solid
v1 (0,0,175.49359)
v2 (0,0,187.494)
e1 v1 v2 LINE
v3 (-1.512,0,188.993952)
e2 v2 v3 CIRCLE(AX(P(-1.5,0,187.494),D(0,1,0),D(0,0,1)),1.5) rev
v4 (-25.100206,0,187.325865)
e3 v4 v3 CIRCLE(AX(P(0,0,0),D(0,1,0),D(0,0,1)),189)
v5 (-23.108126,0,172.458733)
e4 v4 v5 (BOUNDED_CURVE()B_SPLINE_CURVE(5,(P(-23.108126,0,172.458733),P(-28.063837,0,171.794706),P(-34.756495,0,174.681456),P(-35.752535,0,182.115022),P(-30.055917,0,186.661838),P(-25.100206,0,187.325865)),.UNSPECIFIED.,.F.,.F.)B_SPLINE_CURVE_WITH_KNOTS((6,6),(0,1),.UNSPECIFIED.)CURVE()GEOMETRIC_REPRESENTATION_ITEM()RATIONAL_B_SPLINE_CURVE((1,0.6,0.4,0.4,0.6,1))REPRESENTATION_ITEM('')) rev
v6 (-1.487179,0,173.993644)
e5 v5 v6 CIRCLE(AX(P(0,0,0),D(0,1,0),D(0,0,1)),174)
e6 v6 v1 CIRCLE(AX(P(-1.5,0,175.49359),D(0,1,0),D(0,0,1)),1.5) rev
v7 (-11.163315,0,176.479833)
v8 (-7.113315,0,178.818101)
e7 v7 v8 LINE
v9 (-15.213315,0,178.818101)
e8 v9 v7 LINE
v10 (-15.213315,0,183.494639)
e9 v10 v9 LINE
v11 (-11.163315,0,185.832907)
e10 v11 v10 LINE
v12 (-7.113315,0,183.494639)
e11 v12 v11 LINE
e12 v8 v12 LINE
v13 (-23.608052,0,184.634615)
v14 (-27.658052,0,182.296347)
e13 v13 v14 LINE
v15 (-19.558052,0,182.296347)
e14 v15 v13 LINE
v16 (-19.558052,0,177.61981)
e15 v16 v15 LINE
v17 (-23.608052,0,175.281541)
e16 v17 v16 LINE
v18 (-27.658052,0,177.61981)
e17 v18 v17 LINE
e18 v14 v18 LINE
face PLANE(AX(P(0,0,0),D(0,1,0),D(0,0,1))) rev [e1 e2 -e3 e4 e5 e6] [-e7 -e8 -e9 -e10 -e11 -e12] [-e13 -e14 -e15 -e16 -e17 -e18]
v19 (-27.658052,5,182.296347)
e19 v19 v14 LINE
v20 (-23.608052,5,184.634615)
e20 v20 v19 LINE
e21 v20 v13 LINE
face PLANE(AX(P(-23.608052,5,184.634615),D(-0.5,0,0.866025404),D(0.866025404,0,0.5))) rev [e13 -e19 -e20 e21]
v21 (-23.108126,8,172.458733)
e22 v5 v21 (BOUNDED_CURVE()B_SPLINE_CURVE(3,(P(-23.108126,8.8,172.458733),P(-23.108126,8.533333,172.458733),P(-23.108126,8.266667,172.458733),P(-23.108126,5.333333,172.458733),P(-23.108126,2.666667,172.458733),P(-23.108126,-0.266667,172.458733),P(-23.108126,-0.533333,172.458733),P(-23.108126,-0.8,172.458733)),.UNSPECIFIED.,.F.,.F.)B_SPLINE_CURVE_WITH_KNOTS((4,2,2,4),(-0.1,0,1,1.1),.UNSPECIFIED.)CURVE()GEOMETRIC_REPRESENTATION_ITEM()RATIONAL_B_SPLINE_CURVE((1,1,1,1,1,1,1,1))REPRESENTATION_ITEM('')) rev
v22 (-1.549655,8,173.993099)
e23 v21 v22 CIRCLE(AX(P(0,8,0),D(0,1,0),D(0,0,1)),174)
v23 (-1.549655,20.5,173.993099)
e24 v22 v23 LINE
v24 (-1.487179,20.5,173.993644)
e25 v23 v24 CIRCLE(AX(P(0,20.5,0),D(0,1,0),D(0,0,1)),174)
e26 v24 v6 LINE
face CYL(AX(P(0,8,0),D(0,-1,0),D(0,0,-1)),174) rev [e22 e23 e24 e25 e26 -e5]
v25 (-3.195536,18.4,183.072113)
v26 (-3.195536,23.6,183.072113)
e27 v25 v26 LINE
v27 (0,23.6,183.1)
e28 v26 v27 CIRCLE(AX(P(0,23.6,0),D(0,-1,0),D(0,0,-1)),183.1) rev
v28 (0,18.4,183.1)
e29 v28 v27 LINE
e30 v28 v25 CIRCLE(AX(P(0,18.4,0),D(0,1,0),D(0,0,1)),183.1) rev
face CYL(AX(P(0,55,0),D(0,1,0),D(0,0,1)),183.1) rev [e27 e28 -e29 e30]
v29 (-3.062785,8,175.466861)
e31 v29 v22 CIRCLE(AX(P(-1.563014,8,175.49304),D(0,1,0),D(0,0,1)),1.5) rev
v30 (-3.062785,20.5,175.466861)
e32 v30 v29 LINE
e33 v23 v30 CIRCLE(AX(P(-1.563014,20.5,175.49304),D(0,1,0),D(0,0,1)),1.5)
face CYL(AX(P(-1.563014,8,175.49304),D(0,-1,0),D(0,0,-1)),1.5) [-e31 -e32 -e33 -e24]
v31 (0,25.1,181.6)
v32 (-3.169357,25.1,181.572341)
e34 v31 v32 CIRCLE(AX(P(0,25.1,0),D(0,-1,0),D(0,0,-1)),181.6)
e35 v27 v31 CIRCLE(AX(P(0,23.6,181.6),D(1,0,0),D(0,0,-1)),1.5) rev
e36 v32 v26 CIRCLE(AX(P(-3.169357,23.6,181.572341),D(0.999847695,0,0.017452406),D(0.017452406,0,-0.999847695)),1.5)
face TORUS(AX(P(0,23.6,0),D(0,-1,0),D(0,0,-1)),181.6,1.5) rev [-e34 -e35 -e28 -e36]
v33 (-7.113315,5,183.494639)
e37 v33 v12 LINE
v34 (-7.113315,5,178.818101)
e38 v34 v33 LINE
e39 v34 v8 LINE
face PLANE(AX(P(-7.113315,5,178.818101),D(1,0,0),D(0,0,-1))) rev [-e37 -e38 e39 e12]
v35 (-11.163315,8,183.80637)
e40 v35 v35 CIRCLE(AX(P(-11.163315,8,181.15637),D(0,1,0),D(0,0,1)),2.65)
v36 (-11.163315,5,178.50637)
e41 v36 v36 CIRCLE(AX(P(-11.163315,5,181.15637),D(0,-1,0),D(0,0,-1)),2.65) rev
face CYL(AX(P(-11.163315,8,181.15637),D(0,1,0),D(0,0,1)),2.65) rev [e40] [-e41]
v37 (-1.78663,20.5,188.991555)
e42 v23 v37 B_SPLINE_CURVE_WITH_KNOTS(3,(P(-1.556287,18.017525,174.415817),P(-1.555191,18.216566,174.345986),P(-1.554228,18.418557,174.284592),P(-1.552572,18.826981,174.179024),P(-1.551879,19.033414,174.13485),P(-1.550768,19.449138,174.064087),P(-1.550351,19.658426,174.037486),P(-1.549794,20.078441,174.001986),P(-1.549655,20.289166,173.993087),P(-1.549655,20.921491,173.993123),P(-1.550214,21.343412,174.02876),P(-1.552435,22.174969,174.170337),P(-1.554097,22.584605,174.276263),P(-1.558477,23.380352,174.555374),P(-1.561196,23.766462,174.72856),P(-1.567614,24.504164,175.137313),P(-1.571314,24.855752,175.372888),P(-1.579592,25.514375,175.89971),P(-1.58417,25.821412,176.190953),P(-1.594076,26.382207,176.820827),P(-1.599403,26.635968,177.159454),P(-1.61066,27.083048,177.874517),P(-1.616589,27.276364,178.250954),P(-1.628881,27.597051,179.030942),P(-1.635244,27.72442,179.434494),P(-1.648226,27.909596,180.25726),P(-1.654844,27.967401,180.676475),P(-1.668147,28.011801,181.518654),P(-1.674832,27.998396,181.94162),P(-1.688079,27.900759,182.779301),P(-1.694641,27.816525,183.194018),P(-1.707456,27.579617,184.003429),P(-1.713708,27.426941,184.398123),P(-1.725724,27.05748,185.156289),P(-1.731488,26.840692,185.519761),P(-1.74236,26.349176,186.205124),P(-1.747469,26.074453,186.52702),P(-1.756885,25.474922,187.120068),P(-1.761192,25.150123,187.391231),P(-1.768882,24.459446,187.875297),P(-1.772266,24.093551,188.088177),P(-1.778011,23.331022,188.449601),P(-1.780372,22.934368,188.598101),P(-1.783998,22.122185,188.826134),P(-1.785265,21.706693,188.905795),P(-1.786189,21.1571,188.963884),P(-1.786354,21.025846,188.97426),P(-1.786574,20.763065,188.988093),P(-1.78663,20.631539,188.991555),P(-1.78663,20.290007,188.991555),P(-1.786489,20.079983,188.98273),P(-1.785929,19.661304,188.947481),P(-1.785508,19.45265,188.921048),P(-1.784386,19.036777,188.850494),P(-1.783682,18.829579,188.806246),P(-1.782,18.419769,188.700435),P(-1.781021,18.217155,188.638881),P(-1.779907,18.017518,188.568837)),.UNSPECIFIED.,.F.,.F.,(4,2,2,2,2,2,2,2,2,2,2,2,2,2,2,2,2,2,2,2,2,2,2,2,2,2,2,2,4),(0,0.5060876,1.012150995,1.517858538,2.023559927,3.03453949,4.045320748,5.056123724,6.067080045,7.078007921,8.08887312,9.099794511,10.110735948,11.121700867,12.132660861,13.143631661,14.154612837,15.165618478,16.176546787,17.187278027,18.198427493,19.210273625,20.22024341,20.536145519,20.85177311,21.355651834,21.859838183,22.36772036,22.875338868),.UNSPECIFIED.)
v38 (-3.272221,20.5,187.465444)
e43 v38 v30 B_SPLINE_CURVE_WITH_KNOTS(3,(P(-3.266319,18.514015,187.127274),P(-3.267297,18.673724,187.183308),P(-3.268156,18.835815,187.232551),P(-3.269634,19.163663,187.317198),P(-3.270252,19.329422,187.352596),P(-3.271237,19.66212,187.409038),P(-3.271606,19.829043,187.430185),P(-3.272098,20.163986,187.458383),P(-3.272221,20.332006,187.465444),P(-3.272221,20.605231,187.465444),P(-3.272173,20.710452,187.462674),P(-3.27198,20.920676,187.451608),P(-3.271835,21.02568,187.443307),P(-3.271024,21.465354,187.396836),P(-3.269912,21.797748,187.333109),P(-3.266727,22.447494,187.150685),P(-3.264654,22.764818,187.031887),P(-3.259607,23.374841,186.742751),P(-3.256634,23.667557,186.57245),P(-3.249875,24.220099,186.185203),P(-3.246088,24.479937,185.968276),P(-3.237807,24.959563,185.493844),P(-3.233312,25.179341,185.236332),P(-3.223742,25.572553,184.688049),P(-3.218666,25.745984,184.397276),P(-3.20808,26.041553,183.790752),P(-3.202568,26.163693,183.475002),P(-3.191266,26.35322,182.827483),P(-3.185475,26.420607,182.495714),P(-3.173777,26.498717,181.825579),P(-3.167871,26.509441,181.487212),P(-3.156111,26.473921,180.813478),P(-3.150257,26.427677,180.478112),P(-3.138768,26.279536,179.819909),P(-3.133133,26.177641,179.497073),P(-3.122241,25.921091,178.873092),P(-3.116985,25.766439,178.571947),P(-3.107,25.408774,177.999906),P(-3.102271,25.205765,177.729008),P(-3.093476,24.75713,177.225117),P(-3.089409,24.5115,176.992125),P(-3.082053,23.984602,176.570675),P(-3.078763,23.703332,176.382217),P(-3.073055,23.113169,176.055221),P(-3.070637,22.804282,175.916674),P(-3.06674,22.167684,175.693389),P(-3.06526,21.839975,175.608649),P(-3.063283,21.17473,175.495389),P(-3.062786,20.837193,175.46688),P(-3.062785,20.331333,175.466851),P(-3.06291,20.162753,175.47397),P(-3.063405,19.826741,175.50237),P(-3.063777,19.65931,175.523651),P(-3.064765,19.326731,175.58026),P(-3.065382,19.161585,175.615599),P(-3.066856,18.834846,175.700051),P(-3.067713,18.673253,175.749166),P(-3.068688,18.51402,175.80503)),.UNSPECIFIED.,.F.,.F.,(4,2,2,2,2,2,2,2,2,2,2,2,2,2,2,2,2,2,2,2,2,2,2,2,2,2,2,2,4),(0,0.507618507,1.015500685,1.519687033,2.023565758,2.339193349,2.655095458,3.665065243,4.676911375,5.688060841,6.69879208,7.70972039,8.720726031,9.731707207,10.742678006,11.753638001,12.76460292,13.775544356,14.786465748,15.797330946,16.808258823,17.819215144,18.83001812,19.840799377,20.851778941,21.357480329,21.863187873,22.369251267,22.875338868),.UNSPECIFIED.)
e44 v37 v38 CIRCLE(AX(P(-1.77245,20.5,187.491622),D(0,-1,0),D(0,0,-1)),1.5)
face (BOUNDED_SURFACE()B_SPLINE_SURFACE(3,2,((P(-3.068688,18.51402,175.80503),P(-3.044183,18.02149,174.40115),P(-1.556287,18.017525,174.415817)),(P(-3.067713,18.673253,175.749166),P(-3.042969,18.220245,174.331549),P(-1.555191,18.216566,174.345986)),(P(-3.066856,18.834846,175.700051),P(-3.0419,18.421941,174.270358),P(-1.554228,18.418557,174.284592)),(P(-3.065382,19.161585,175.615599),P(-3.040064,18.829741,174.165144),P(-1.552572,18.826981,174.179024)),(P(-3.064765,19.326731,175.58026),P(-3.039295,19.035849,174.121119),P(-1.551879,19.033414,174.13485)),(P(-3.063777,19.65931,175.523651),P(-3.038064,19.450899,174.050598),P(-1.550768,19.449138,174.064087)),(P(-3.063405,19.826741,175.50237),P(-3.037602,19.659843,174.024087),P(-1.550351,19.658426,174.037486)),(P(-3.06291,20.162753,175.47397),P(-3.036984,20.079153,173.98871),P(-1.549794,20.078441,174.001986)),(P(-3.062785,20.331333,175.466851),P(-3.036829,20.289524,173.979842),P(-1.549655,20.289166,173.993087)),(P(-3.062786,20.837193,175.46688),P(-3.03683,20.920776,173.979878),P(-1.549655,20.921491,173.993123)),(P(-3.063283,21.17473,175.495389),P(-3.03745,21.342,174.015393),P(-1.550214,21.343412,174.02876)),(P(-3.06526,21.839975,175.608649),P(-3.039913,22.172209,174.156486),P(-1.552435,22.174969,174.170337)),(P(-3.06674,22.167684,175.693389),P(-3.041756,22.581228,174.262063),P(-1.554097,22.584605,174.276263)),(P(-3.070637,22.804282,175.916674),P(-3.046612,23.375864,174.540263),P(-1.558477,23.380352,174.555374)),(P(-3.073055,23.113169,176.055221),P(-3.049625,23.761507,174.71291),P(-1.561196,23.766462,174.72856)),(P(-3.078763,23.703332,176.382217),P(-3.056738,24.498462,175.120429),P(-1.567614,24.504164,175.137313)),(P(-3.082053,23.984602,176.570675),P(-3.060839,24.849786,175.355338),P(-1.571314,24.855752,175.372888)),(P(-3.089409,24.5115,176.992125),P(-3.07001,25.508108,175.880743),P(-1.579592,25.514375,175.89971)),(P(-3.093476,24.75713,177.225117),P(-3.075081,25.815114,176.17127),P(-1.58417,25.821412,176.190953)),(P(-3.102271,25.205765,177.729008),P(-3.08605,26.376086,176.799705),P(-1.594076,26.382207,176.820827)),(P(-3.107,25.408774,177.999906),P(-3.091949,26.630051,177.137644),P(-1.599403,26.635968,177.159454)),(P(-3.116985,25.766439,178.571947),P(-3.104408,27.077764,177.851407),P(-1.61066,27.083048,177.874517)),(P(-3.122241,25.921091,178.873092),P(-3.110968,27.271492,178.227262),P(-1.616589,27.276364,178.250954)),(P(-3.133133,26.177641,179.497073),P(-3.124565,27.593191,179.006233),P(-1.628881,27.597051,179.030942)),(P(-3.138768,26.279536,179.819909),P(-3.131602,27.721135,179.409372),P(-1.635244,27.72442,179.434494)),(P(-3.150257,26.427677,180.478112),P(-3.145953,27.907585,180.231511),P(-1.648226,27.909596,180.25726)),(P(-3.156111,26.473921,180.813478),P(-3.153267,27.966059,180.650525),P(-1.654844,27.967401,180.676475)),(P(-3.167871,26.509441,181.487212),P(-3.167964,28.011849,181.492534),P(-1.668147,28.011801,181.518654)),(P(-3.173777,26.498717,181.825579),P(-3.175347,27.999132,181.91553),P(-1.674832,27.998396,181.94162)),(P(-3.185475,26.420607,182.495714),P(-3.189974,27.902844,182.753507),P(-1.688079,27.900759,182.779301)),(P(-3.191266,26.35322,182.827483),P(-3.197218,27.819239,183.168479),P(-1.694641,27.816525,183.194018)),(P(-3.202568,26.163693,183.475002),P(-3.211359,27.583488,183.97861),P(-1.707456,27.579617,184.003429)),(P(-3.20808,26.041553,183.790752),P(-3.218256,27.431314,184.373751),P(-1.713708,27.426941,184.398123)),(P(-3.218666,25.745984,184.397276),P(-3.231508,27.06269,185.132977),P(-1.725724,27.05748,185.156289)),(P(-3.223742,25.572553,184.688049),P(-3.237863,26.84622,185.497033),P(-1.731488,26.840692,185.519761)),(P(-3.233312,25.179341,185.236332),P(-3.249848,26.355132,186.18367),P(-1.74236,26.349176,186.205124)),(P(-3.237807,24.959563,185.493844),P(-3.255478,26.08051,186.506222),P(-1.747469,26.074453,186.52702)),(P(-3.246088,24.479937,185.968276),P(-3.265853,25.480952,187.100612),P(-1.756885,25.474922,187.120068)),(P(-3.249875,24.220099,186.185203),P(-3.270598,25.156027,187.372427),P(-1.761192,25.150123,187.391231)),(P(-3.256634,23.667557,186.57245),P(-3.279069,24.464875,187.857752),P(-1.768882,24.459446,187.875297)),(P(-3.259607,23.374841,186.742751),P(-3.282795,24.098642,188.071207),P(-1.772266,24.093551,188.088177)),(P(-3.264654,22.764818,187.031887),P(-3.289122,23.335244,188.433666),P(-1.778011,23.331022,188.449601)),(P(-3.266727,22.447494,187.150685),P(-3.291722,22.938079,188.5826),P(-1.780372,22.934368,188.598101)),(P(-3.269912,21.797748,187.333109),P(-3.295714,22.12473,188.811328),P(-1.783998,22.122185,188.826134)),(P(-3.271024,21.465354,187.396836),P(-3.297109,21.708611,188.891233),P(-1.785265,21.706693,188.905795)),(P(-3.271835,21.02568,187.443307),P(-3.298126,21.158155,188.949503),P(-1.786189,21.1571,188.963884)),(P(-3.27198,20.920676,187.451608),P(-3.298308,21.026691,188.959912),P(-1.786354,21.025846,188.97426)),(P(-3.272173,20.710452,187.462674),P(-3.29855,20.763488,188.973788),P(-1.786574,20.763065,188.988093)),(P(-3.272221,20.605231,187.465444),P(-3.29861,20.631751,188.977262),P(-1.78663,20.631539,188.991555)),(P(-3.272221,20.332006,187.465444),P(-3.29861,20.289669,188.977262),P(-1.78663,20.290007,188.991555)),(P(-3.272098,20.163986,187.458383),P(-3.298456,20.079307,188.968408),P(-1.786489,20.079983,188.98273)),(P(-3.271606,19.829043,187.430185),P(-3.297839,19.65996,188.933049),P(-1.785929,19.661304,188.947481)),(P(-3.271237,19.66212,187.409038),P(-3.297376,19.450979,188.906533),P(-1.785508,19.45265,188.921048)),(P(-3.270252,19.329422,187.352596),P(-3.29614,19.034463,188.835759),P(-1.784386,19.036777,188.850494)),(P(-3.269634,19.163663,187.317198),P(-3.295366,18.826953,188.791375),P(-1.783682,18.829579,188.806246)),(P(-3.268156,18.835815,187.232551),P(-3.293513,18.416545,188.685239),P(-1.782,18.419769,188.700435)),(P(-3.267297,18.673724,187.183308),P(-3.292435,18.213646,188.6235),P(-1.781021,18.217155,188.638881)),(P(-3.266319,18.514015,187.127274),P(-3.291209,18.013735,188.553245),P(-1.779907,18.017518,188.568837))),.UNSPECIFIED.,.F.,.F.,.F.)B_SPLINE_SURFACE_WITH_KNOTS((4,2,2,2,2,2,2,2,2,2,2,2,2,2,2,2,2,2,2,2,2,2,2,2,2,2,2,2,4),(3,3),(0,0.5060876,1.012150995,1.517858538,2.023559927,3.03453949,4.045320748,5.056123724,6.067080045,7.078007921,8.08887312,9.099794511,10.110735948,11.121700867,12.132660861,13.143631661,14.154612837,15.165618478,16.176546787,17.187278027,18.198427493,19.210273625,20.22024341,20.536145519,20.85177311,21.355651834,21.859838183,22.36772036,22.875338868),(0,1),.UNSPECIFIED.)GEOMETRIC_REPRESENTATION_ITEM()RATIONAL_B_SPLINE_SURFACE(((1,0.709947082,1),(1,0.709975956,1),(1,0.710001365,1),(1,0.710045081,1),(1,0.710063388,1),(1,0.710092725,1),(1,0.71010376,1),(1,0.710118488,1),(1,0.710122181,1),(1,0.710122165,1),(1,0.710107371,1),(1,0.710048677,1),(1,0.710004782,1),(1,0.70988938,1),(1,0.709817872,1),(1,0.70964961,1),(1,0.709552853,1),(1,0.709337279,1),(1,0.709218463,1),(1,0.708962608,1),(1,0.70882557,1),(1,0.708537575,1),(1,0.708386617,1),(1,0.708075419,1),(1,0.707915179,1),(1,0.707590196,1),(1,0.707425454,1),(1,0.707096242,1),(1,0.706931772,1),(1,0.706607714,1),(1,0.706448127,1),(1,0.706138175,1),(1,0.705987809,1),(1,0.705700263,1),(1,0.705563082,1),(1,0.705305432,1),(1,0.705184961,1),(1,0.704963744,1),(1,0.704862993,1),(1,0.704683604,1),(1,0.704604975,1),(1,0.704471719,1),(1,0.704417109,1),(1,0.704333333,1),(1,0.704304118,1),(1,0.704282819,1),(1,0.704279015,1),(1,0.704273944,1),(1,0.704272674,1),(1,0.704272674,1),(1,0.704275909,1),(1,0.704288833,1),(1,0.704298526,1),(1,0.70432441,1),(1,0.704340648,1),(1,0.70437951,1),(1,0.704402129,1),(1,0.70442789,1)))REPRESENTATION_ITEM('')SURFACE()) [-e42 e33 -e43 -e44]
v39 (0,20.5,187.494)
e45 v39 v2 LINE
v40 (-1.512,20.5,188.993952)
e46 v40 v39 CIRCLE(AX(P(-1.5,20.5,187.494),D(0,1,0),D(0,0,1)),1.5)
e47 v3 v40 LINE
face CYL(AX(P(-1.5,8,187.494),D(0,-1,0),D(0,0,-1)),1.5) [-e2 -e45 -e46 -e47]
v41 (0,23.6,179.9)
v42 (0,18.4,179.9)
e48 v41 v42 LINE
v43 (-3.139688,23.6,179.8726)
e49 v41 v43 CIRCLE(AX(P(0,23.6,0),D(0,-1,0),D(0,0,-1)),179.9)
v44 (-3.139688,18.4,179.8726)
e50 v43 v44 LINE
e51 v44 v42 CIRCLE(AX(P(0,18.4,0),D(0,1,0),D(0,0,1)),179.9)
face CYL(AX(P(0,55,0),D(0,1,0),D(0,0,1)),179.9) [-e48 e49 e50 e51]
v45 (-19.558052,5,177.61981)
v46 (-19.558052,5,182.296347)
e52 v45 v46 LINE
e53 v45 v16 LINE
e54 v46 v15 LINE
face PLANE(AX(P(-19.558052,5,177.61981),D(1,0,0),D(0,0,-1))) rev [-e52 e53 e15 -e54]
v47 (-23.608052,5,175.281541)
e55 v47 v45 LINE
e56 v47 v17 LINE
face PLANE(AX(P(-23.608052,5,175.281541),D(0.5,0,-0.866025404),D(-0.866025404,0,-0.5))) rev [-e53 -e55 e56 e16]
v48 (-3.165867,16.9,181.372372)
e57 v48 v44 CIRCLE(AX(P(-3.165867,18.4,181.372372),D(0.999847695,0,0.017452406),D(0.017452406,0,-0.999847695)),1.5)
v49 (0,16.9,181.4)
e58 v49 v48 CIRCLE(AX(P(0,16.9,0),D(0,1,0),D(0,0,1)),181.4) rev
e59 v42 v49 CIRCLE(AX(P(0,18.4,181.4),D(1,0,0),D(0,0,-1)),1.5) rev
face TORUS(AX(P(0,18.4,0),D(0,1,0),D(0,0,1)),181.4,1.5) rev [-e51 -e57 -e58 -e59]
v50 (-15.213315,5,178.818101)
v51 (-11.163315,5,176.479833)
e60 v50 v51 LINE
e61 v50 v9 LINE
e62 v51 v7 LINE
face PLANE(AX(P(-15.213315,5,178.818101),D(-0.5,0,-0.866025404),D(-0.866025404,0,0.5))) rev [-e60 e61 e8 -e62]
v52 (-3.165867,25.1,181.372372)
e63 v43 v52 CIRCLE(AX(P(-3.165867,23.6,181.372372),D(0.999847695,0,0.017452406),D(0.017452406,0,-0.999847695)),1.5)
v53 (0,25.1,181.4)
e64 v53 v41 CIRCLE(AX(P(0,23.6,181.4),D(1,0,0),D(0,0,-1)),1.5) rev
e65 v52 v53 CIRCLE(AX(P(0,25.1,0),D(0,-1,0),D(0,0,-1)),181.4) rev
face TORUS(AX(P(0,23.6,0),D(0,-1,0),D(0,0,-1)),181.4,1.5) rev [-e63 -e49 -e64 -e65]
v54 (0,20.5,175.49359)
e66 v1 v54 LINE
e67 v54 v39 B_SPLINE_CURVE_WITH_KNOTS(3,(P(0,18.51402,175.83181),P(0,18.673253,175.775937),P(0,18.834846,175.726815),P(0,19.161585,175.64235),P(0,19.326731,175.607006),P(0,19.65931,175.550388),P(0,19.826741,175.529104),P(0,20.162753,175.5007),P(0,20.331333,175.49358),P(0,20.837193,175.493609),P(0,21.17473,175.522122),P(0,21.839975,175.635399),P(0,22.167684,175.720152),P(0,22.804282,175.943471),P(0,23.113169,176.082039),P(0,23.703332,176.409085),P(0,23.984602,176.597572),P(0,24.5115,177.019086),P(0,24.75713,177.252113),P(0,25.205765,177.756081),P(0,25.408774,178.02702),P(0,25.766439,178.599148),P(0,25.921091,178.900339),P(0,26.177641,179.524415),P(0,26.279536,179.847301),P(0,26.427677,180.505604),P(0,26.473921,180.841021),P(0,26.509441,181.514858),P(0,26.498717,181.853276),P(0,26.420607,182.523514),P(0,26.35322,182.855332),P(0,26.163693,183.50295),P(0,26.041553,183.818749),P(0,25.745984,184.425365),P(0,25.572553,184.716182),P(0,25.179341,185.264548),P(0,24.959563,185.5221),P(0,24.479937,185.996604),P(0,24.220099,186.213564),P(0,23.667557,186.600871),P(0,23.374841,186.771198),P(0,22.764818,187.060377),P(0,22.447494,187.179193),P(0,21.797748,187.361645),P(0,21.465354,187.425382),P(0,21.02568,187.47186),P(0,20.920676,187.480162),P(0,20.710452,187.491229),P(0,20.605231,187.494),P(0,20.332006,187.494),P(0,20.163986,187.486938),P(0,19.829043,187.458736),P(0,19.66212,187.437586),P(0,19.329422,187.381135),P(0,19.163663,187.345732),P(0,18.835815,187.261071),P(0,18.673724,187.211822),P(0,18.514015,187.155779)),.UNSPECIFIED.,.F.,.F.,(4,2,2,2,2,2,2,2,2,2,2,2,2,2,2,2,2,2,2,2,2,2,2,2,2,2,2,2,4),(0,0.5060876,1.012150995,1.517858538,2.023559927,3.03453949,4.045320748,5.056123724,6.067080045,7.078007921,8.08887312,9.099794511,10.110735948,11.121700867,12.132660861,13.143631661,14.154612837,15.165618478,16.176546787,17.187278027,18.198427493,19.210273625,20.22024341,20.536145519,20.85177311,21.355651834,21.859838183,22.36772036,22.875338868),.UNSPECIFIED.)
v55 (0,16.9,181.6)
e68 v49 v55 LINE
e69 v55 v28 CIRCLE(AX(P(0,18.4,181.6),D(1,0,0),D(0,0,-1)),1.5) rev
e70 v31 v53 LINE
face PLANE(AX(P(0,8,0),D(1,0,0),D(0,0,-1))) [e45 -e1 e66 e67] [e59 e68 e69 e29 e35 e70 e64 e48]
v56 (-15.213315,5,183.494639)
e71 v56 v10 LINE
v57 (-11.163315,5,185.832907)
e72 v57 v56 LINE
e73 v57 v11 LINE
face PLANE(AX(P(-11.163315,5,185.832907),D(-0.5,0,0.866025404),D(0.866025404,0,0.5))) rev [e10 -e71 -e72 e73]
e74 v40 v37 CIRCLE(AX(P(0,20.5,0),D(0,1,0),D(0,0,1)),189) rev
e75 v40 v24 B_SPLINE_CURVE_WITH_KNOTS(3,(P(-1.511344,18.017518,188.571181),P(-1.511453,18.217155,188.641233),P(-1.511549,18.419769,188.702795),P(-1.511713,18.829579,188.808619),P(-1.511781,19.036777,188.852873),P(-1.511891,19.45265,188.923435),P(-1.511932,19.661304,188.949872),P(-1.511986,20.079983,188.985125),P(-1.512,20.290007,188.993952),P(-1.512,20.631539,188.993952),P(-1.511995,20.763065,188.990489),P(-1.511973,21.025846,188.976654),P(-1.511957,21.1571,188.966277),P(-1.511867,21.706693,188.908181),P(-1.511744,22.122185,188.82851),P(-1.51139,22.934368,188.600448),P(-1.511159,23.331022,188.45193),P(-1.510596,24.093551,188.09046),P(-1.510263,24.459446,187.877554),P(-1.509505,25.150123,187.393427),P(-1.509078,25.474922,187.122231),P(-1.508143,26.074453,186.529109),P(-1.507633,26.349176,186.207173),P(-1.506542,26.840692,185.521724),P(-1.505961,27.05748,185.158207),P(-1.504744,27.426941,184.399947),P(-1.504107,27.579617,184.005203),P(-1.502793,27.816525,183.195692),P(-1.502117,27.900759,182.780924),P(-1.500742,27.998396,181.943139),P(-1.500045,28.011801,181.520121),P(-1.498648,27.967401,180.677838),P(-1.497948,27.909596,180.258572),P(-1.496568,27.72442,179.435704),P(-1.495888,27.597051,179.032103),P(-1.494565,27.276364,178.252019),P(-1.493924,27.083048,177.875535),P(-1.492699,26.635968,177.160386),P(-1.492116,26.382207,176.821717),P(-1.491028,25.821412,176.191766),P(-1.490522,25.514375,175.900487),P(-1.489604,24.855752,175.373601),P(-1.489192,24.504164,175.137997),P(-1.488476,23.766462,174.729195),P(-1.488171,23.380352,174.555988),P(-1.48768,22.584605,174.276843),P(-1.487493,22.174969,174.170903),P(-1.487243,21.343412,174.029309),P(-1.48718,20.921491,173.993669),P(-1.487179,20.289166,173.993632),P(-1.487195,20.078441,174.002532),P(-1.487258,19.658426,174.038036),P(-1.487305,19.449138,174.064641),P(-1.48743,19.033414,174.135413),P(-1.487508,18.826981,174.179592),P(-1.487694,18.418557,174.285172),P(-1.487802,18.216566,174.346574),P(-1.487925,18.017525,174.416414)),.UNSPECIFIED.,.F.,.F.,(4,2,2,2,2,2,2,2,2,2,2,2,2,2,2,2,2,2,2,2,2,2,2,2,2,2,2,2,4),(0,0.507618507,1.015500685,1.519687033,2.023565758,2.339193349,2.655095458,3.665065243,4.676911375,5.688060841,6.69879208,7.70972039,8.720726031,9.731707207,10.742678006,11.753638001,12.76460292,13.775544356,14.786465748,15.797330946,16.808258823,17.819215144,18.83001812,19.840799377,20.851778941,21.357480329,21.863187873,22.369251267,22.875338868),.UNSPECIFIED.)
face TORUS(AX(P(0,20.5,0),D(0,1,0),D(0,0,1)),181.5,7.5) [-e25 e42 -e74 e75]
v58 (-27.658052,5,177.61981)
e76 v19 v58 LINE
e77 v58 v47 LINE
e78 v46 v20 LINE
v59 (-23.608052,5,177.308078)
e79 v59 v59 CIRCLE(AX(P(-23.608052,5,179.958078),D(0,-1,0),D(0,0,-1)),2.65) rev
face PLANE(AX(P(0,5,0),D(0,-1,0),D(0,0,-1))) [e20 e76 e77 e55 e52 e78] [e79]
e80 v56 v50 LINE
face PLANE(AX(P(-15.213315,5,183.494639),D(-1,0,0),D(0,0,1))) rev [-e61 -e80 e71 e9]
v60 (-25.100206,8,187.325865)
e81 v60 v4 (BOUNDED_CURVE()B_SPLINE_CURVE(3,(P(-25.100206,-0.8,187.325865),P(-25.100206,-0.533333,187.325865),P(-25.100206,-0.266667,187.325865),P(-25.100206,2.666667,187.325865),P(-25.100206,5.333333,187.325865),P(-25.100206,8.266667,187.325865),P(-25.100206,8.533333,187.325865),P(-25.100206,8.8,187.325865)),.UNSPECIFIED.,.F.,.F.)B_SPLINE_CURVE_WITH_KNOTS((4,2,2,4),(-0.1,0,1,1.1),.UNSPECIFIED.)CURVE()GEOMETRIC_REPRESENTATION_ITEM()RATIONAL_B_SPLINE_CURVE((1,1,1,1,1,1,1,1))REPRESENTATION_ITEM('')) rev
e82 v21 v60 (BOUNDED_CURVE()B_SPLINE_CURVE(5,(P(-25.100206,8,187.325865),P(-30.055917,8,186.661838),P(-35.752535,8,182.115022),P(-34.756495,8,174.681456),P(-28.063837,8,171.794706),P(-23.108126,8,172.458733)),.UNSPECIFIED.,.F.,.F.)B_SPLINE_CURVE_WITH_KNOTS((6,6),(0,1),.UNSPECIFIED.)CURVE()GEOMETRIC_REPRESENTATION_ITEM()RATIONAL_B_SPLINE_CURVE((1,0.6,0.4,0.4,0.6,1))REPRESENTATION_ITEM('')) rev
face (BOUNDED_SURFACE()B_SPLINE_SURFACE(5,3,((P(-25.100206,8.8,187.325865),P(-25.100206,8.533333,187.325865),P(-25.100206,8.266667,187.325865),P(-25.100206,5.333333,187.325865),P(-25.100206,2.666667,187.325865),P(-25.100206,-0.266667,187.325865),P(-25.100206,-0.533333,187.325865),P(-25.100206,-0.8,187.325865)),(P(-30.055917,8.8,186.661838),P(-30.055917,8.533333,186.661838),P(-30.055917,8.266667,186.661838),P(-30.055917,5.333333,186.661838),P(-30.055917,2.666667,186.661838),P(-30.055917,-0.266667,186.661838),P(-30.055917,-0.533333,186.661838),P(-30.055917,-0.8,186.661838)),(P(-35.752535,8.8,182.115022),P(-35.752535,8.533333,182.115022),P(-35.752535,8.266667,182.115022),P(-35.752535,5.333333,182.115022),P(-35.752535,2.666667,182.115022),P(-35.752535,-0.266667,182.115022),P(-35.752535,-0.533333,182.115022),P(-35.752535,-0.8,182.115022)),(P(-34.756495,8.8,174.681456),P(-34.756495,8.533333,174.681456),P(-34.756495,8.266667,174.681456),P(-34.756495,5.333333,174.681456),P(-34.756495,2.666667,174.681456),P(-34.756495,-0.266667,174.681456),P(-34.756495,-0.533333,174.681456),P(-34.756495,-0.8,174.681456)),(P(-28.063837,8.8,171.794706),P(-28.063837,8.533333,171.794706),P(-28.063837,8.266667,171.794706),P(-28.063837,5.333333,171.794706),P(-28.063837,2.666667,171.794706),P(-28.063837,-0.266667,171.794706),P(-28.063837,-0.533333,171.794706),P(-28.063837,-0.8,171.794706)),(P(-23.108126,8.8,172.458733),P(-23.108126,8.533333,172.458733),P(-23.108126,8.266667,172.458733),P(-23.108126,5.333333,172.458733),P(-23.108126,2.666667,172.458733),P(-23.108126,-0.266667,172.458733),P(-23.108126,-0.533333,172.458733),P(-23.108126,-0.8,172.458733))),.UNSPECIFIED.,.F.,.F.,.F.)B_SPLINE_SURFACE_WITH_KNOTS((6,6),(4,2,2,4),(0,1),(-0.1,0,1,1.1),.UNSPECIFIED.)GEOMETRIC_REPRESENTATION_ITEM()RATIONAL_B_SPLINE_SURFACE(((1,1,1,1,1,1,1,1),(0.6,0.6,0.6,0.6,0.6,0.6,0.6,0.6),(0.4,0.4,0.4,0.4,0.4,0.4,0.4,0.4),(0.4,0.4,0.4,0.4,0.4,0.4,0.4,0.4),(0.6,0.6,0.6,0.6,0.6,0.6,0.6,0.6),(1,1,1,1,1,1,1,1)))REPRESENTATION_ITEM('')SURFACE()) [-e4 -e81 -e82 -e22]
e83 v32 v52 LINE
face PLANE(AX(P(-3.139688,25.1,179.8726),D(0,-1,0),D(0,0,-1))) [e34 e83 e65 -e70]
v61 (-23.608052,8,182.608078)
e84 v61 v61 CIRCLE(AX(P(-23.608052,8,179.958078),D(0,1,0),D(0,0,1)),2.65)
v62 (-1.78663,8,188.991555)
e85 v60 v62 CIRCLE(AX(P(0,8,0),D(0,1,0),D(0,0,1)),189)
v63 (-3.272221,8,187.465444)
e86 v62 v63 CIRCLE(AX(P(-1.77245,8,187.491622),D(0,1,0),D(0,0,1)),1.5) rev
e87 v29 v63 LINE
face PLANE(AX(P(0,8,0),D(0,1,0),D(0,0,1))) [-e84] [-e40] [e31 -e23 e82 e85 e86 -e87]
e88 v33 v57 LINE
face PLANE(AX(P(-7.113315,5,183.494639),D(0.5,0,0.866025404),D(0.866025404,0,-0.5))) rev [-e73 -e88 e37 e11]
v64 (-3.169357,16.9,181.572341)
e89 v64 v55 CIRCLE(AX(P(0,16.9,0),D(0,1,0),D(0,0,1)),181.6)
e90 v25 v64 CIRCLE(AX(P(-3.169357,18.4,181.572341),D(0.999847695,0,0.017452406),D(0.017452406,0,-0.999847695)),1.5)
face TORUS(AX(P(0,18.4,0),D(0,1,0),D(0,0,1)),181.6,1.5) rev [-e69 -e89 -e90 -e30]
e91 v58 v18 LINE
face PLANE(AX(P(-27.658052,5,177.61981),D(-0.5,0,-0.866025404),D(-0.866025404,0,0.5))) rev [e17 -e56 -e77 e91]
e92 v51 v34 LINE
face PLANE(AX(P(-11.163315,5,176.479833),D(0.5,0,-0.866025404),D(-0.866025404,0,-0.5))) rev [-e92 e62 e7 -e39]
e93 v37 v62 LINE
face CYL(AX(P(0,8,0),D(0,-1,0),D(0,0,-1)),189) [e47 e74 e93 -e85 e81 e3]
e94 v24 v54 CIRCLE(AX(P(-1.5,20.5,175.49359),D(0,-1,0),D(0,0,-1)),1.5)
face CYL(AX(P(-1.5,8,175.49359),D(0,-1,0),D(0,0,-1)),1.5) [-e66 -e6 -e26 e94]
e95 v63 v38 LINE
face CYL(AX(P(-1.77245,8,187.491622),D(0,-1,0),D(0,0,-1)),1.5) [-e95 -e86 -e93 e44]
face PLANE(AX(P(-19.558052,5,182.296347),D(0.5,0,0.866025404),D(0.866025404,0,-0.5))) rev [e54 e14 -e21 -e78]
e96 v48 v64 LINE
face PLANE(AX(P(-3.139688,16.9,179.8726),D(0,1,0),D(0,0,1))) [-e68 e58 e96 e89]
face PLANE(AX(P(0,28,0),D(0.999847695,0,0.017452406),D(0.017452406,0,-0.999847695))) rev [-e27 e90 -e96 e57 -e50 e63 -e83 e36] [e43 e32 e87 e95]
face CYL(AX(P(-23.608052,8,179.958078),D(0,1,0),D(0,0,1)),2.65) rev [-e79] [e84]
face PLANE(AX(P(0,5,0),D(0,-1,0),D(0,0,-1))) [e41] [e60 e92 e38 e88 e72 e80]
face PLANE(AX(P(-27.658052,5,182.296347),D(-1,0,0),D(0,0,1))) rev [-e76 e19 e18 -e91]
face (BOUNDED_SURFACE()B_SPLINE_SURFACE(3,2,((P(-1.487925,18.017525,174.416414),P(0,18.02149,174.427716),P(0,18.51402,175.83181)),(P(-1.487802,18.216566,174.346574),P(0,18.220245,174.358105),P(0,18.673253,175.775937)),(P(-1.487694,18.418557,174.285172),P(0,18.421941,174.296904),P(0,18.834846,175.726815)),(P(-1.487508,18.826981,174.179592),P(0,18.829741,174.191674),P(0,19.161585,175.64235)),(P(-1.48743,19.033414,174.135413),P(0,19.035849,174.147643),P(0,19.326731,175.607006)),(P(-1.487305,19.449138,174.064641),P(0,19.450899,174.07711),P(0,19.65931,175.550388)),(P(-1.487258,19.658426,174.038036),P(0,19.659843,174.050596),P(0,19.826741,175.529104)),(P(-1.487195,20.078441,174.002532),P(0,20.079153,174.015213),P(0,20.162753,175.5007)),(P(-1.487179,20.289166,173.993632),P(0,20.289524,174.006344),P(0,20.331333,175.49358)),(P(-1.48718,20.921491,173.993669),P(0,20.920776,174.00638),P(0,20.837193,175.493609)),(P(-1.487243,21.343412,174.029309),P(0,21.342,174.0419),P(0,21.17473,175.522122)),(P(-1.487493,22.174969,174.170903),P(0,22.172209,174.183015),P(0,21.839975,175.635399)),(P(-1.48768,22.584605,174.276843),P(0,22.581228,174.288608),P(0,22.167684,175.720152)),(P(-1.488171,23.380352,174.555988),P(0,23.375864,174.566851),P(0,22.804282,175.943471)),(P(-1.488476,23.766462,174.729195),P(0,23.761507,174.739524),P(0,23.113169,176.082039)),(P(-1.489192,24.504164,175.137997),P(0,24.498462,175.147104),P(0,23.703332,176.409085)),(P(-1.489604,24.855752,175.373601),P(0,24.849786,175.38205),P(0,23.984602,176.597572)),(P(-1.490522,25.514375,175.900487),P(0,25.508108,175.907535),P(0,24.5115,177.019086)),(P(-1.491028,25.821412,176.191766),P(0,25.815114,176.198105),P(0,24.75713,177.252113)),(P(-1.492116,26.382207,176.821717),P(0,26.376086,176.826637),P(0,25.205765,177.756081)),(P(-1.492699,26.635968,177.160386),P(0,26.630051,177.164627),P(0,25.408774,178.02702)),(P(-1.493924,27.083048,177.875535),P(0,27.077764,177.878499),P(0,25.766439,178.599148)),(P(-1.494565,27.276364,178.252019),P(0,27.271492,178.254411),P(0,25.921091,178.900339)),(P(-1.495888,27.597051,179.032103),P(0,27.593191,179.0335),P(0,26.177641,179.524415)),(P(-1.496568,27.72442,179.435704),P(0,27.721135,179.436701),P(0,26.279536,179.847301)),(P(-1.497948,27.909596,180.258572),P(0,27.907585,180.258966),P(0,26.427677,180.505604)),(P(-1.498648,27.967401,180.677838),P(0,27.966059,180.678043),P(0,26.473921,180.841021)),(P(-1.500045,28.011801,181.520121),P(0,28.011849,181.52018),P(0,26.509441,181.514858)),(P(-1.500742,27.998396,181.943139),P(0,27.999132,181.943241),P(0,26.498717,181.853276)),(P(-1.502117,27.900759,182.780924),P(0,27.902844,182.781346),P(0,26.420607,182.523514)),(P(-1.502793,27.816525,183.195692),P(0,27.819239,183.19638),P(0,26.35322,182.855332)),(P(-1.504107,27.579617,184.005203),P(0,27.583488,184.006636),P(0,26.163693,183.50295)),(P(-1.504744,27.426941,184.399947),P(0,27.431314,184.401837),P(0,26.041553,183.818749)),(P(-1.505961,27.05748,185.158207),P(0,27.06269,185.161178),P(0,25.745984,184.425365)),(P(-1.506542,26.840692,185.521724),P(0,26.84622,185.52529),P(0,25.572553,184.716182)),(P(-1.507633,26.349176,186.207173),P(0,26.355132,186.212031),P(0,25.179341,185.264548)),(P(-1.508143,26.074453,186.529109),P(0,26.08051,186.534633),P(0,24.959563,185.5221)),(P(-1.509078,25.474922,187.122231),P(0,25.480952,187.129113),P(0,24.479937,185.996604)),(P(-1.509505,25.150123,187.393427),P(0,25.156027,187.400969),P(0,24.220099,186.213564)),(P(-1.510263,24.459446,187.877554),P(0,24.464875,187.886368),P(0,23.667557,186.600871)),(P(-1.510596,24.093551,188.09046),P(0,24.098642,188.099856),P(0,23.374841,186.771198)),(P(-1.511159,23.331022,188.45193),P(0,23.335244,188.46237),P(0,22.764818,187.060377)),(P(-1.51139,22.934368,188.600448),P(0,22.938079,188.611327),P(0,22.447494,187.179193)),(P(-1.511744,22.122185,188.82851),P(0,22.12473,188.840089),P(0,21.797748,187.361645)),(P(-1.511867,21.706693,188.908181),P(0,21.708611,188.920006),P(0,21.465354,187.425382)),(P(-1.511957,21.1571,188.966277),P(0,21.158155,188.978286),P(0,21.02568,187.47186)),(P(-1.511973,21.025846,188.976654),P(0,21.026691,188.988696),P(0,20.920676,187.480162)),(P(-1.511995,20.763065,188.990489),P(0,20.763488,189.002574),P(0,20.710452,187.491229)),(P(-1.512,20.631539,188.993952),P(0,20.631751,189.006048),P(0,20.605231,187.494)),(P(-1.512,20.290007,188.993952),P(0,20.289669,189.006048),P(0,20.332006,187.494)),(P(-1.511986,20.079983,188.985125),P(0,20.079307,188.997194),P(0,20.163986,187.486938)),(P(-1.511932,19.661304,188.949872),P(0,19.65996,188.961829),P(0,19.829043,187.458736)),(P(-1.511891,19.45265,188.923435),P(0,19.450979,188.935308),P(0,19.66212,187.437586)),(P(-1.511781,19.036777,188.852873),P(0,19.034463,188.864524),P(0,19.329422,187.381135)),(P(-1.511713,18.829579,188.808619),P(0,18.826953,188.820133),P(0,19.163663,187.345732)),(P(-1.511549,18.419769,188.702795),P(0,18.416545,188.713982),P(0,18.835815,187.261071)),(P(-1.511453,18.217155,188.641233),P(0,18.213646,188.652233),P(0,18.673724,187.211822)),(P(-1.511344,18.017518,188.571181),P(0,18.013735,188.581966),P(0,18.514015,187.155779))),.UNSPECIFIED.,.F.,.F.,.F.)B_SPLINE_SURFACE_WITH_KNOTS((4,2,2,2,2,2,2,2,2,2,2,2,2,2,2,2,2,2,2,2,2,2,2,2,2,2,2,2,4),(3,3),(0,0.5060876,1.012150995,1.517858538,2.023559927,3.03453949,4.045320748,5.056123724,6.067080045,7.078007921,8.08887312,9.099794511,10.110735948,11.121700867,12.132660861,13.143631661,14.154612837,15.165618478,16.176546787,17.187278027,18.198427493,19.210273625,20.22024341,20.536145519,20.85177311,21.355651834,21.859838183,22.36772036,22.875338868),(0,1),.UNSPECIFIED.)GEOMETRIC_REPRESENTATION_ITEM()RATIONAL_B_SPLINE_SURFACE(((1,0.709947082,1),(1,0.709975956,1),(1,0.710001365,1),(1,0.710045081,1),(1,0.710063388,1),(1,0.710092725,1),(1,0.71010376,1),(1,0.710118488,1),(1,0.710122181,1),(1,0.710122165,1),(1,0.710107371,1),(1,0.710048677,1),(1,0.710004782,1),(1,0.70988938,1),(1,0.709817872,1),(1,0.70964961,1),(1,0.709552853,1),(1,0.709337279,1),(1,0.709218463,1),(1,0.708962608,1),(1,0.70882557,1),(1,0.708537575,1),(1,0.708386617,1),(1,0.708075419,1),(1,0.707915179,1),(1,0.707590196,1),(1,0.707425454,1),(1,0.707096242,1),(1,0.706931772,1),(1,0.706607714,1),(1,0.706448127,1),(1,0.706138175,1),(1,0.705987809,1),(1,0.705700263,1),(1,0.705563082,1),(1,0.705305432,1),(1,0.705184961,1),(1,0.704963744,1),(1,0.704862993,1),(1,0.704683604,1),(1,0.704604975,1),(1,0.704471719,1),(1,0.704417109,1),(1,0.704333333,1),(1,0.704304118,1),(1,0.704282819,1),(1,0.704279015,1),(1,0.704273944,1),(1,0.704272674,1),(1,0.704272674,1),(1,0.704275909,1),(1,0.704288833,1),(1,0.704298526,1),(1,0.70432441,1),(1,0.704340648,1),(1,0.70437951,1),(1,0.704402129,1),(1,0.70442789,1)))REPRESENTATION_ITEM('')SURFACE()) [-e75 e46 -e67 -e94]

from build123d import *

# Parameters (mm, degrees)
EXTRUDE_1_DEPTH     = 8
EXTRUDE_2_DEPTH     = 20
HOLE_WIZARD_M5_1_D  = 5.3
FILLET_1_R          = 7.5
FILLET_2_DEPTH      = 8
SKETCH_5_W          = 3.1999999999999886
SKETCH_5_H          = 8.2
FILLET_3_R          = 1.5
FILLET_4_R          = 1.5
CUT_EXTRUDE_1_DEPTH = 5


with BuildPart() as part:
    # 草图1 → 凸台-拉伸1 (new body)
    with BuildSketch(Plane(origin=(0, 0, 0), x_dir=(1, 0, 0), z_dir=(0, 1, 0))):
        with BuildLine():
            Line((2.098e-14, -189), (1.932e-14, -174.00000000000003))
            ThreePointArc((2.28618e-12, -174.00000000000003), (-15.165099238093463, -173.33787746796366), (-30.214782914050144, -171.35654902412347))
            Line((-30.214782914045937, -171.35654902412418), (-32.8195055790499, -186.12866531930732))
            ThreePointArc((-32.81950557905, -186.12866531930732), (-16.472435379307413, -188.28079793933995), (-3.472e-14, -189.00000000000003))
        make_face()
    extrude(amount=EXTRUDE_1_DEPTH)

    # 草图4 → 凸台-拉伸2 (add)
    with BuildSketch(Plane(origin=(0, 8, 0), x_dir=(1, 0, 0), z_dir=(0, 1, 0))):
        with BuildLine():
            Line((2.082e-14, -189), (1.916e-14, -174))
            ThreePointArc((-3.196e-14, -174.00000000000003), (-1.5184171767173116, -173.99337461316583), (-3.0367187200877925, -173.9734989572121))
            Line((-3.036718720087315, -173.97349895721206), (-3.298504816646567, -188.97121438455795))
            ThreePointArc((-3.2985048166465822, -188.971214384558), (-1.6493152091926062, -188.99280345912842), (-3.472e-14, -189.00000000000006))
        make_face()
    extrude(amount=EXTRUDE_2_DEPTH)

    # M5 间隙孔1 (through all)
    with Locations(Plane(origin=(0, 8, 0), x_dir=(1, 0, 0), z_dir=(0, 1, 0))):
        with Locations((-23.608051681, -179.958078162), (-11.163314825, -181.156370029)):
            Hole(HOLE_WIZARD_M5_1_D / 2)

    # 圆角1
    # the kernel refuses this fillet: 7.5 mm, written as the material it takes off along each edge
    with BuildSketch(Plane(origin=(1.47232e-12, 28, -1.0760459e-10), x_dir=(0.10755019962978496, 0, 0.9941996552803635), z_dir=(0.9941996552803635, 0, -0.10755019962978496))) as fillet_1_piece_1:
        with BuildLine():
            CenterArc((174.00000000010766 + FILLET_1_R, FILLET_1_R), FILLET_1_R, 180, 89.99999999999977)
            Line((174.00000000010766 + FILLET_1_R, 0), (174.00000000010766, 0))
            Line((174.00000000010766, 0), (174.00000000010766, FILLET_1_R))
        make_face()
    revolve(axis=Axis((1.47232e-12, 28, -1.0760459e-10), (0, -1, 0)), revolution_arc=13.348228955549553, mode=Mode.SUBTRACT)
    with BuildSketch(Plane(origin=(2.05469e-12, 28, -2.9481839e-10), x_dir=(-0.11639521392683701, 0, 0.9932029773288671), z_dir=(-0.9932029773288671, 0, -0.11639521392683701))) as fillet_1_piece_2:
        with BuildLine():
            CenterArc((189.0000000002949 - FILLET_1_R, -FILLET_1_R), FILLET_1_R, 0, 89.99999999999957)
            Line((189.0000000002949 - FILLET_1_R, 0), (189.0000000002949, 0))
            Line((189.0000000002949, 0), (189.00000000029488, -FILLET_1_R))
        make_face()
    revolve(axis=Axis((2.05469e-12, 28, -2.9481839e-10), (0, 1, 0)), revolution_arc=12.368210784462358, mode=Mode.SUBTRACT)

    # 圆角2: read off the stored shape, not the designer's step
    # 圆角2 outline → 圆角2 (cut)
    with BuildSketch(Plane(origin=(0, 0, 0), x_dir=(1, 0, 0), z_dir=(0, 1, 0))):
        with BuildLine():
            ThreePointArc((-32.819505579, -186.128665319), (-28.966041771, -186.767150281), (-25.100206236, -187.325864863))
            add(Edge.make_bspline(
                [(-25.100206236, -187.325864863), (-27.006863278382305, -187.07038767754574), (-29.132080374521447, -186.17341393049847), (-31.048536919413714, -184.35464406978926), (-32.02623112721157, -181.62978297542463), (-31.490224503, -178.589937725)],
                knots=[0, 0, 0, 0, 0, 0, 0.5103349834155644, 0.5103349834155644, 0.5103349834155644, 0.5103349834155644, 0.5103349834155644, 0.5103349834155644], degree=5, weights=[1, 0.7958660065557144, 0.6438203721908997, 0.5438630969055563, 0.4959941806996843, 0.5002136235732837]))
            Line((-31.490224503, -178.589937725), (-32.819505579, -186.128665319))
        make_face()
        with BuildLine():
            Line((-30.214782914, -171.356549024), (-31.490224503, -178.589937725))
            add(Edge.make_bspline(
                [(-31.490224503, -178.589937725), (-30.984360135627078, -175.72103774319677), (-29.29551148466263, -173.58668082656104), (-27.075163325391554, -172.48015181385665), (-24.918748626576246, -172.21612345785414), (-23.108126376, -172.458732732)],
                knots=[0.5103349834155644, 0.5103349834155644, 0.5103349834155644, 0.5103349834155644, 0.5103349834155644, 0.5103349834155644, 1, 1, 1, 1, 1, 1], degree=5, weights=[0.5002136235732837, 0.5042621674352976, 0.5562650770089762, 0.6562223522943196, 0.8041339932913276, 1]))
            ThreePointArc((-23.108126376, -172.458732732), (-26.667149567, -171.944360576), (-30.214782914, -171.356549024))
        make_face()
    extrude(amount=FILLET_2_DEPTH, mode=Mode.SUBTRACT)

    # 草图5 → 切除-旋转1 (revolve, cut)
    with BuildSketch(Plane(origin=(0, 0, 0), x_dir=(-0.01745240643728342, 0, 0.9998476951563913), z_dir=(-0.9998476951563913, 0, -0.01745240643728342))):
        with Locations((181.5, 20.99999999999998)):
            Rectangle(SKETCH_5_W, SKETCH_5_H)
    revolve(axis=Axis((0, 55.00000000000001, 0), (0, -1, 0)), mode=Mode.SUBTRACT)

    # 圆角3
    fillet_3_edges = [part.edges().sort_by_distance(p)[0] for p in [
        (-1.5978286497523058, 25.09999999999998, 183.09302811304977),
        (-1.5978286497523058, 16.899999999999984, 183.09302811304977),
        (-1.5699037361575081, 16.899999999999984, 179.89314995924443),
        (-1.5699037361575081, 25.09999999999998, 179.89314995924443),
    ]]
    fillet(fillet_3_edges, radius=FILLET_3_R)

    # 圆角4
    fillet_4_edges = [part.edges().sort_by_distance(p)[0] for p in [
        (-8.49e-15, 10.25, 189.00000000000003),
        (-3.2985048166465747, 14.25, 188.97121438455798),
        (-3.0367187200875536, 14.25, 173.9734989572121),
        (7.2842e-13, 10.25, 174.00000000000003),
        (-1.5838661929530051, 28, 181.4930890361471),
        (-1.5838661929530051, 28, 181.4930890361471),
    ]]
    fillet(fillet_4_edges, radius=FILLET_4_R)

    # 草图6 → 切除-拉伸1 (cut)
    with BuildSketch(Plane.XZ):
        Polygon((-23.608051681342282, 175.2815409817045), (-19.55805168134228, 177.6198095719225), (-19.55805168134228, 182.29634675235855), (-23.608051681342257, 184.6346153425765), (-27.658051681342297, 182.29634675235852), (-27.658051681342297, 177.6198095719225), align=None)
        Polygon((-11.163314825368898, 176.479832848635), (-7.113314825368922, 178.81810143885298), (-7.1133148253689225, 183.49463861928896), (-11.163314825368879, 185.83290720950694), (-15.213314825368883, 183.49463861928893), (-15.213314825368883, 178.81810143885298), align=None)
    extrude(amount=-CUT_EXTRUDE_1_DEPTH, mode=Mode.SUBTRACT)


solid = part.part
